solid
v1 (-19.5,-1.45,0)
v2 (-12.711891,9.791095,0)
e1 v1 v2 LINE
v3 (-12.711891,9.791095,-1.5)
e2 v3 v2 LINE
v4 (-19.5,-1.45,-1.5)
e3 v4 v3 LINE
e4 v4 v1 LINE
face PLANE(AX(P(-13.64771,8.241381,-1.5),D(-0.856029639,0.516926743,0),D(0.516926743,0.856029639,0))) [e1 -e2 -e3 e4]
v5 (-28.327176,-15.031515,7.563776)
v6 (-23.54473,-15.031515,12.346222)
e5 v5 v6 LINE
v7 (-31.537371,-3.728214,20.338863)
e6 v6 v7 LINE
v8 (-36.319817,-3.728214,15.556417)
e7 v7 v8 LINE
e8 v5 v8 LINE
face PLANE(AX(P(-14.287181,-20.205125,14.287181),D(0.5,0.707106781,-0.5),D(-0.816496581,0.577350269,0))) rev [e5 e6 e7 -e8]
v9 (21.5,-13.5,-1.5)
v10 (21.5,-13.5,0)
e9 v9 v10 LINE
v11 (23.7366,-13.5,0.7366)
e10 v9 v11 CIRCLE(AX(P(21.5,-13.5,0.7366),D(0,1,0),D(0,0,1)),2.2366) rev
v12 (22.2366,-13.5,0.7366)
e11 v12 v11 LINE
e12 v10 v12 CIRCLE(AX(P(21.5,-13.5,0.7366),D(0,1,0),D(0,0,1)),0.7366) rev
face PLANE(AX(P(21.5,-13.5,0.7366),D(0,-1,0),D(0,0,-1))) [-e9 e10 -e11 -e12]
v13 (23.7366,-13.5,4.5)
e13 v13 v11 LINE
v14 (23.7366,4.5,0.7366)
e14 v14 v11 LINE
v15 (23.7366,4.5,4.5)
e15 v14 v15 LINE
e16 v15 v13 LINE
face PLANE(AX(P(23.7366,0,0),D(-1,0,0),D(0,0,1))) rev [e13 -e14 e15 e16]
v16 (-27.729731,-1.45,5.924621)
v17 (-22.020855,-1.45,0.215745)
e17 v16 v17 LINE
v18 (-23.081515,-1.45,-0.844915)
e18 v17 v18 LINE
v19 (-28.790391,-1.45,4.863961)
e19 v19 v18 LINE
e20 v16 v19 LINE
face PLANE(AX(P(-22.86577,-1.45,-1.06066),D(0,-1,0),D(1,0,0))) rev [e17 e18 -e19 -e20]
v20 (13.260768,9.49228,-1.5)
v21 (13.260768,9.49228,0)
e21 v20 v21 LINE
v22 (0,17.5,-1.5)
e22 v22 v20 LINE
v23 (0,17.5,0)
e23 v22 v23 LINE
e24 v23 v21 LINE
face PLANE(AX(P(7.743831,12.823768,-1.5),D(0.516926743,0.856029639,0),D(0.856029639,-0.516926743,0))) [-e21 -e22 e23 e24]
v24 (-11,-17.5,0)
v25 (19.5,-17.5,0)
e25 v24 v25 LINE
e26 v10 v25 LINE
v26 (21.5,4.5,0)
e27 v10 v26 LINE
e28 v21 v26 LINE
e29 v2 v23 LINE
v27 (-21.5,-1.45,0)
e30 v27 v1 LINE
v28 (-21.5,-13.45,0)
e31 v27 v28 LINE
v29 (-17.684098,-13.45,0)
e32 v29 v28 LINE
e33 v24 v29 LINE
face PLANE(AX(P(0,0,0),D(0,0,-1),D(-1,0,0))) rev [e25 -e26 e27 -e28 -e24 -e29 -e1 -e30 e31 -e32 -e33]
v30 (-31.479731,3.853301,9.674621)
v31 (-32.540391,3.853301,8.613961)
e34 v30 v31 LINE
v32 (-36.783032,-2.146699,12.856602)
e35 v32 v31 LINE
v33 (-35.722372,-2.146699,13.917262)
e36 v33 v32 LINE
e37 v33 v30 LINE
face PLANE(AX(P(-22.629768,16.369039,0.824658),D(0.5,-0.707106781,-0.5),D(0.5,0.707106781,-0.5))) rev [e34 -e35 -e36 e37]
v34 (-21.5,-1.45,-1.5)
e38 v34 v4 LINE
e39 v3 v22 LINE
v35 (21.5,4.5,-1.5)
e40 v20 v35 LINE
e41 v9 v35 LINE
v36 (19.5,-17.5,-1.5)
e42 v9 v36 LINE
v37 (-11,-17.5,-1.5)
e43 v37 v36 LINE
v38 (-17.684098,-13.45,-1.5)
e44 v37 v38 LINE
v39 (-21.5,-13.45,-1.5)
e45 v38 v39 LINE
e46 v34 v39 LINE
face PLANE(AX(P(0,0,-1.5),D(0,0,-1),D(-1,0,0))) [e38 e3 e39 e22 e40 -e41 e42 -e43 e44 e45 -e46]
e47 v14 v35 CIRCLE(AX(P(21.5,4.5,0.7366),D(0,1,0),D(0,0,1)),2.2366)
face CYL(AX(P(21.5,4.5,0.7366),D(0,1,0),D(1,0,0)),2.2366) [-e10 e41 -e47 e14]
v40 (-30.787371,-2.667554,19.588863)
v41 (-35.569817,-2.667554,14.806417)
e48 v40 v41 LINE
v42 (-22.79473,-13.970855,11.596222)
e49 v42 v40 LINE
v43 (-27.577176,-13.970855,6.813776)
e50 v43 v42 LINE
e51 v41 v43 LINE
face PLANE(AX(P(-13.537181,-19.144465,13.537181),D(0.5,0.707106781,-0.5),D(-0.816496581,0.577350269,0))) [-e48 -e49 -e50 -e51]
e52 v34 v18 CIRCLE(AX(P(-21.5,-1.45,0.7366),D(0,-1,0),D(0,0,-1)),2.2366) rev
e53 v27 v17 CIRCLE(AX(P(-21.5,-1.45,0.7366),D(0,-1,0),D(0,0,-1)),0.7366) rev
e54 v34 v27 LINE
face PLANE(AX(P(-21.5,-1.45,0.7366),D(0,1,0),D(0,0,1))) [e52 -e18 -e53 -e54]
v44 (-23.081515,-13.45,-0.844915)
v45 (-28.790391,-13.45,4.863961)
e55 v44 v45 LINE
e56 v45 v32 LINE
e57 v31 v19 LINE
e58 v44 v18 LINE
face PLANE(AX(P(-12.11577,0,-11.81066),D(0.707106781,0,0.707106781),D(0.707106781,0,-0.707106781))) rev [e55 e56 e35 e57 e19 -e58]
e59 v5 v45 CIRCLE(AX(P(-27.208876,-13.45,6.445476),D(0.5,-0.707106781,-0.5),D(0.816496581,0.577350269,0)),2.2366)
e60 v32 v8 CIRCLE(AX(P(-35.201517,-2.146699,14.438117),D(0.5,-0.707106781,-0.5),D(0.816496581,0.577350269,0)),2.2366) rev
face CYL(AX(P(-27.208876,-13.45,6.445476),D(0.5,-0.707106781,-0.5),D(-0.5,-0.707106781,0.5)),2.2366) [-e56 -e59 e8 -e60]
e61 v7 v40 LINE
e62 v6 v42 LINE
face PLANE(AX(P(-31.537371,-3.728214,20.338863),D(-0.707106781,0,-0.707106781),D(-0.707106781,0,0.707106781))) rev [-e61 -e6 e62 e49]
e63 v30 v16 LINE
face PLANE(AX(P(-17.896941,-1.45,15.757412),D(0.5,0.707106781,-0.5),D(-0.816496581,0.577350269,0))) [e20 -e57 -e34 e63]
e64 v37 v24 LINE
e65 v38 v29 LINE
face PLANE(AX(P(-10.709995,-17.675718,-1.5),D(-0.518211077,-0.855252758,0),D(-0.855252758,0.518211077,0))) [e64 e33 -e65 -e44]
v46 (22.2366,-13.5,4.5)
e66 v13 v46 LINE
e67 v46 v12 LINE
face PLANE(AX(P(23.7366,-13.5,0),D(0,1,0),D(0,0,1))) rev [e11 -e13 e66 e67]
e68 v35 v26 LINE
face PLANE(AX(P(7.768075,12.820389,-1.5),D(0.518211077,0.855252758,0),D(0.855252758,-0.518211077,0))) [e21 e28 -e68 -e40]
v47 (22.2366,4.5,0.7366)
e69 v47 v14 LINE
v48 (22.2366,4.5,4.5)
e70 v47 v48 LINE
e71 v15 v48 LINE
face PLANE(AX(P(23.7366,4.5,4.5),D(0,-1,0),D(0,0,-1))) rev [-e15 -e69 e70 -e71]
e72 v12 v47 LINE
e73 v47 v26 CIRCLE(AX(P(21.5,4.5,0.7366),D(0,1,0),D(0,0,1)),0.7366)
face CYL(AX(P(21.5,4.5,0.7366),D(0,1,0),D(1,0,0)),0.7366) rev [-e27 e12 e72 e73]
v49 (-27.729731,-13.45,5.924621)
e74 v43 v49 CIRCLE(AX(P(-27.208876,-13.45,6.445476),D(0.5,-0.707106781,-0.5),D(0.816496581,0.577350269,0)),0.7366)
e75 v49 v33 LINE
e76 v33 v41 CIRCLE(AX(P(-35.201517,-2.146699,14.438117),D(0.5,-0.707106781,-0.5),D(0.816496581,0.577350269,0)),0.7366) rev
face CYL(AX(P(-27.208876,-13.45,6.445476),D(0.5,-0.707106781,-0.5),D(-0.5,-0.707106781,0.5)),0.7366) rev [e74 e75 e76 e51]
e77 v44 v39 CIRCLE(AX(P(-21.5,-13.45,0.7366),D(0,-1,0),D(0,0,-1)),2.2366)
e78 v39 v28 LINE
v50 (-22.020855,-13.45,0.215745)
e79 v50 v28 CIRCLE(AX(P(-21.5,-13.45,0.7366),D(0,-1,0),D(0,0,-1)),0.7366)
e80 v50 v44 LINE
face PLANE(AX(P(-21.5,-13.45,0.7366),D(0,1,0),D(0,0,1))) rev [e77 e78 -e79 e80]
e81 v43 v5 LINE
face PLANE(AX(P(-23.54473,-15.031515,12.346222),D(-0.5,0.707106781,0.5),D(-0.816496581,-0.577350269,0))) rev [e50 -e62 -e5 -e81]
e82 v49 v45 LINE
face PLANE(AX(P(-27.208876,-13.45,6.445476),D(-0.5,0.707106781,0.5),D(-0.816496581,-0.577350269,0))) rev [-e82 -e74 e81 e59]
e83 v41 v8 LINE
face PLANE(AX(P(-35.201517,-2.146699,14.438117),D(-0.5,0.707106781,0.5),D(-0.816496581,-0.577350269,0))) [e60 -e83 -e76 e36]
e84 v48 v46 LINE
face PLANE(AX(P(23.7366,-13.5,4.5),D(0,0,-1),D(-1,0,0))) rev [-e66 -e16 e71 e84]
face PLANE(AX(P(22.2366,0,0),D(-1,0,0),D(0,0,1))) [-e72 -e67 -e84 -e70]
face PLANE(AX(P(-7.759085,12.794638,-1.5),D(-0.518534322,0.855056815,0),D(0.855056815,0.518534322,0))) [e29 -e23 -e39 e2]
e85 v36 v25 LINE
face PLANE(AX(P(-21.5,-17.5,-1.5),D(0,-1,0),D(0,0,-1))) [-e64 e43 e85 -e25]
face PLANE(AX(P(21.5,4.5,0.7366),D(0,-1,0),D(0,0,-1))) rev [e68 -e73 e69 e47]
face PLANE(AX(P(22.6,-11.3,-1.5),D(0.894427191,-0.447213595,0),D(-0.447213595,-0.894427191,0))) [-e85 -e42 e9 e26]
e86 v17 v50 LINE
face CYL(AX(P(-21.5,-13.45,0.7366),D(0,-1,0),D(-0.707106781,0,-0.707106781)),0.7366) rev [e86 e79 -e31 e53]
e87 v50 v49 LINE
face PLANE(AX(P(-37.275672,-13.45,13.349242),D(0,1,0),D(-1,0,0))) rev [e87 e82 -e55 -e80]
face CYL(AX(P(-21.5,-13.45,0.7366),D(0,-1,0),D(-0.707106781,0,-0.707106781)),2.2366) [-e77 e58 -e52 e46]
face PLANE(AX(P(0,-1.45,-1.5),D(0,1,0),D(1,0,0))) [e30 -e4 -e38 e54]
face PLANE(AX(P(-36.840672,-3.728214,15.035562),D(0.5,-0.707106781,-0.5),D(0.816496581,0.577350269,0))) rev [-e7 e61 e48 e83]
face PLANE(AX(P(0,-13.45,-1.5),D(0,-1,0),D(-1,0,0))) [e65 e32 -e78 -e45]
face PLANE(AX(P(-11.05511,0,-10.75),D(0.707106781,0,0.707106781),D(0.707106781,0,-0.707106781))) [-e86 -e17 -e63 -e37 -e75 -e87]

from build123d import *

# Parameters (mm, degrees)
CROQUIS1_W              = 43
CROQUIS1_H              = 35
BRIDA_BASE1_DEPTH       = 1.5
CROQUIS6_W              = 59.566817112
CROQUIS6_H              = 45.88022185
CORTAR_EXTRUIR1_DEPTH   = 10
BRIDA_DE_ARISTA1_DEPTH  = 18
BRIDA_DE_ARISTA2_DEPTH  = 12
CORTAR_EXTRUIR2_DEPTH   = 10
SALIENTE_EXTRUIR1_DEPTH = 1.5
CORTAR_EXTRUIR3_DEPTH   = 10
BRIDA_DE_ARISTA3_DEPTH  = 15.985281374


# Sheet-metal steps are written as plain solids
with BuildPart() as part:
    # Croquis1 → Brida base1 (new body)
    with BuildSketch(Plane.XY):
        Rectangle(CROQUIS1_W, CROQUIS1_H)
    extrude(amount=-BRIDA_BASE1_DEPTH)

    # Croquis6 → Cortar-Extruir1 (cut)
    with BuildSketch(Plane.XY):
        Rectangle(CROQUIS6_W, CROQUIS6_H)
        Polygon((19.5, -17.5), (21.5, -13.5), (21.5, 4.5), (13.260768396, 9.49227982), (0, 17.5), (-12.711890801, 9.791095082), (-19.5, -1.45), (-21.5, -1.45), (-21.5, -13.45), (-17.684098087, -13.45), (-11, -17.5), align=None, mode=Mode.SUBTRACT)
    extrude(amount=-CORTAR_EXTRUIR1_DEPTH, mode=Mode.SUBTRACT)

    # Brida de arista1 section (across the edge) → Brida de arista1 (add)
    with BuildSketch(Plane(origin=(22.2366, -13.5, 0), x_dir=(-1, 0, 0), z_dir=(0, 1, 0))):
        with BuildLine():
            Line((-1.5, 0.7366), (-1.5, 4.5))
            Line((-1.5, 4.5), (0, 4.5))
            Line((0, 4.5), (0, 0.7366))
            ThreePointArc((0, 0.7366), (0.215745145, 0.215745145), (0.7366, 0))
            Line((0.7366, 0), (0.7366, -1.5))
            ThreePointArc((0.7366, -1.5), (-0.844915027, -0.844915027), (-1.5, 0.7366))
        make_face()
    extrude(amount=BRIDA_DE_ARISTA1_DEPTH)

    # Brida de arista2 section (across the edge) → Brida de arista2 (add)
    with BuildSketch(Plane(origin=(-21.80510971, -1.45, 0), x_dir=(0.7071067811865438, 0, 0.7071067811865512), z_dir=(0, -1, 0))):
        with BuildLine():
            Line((-1.5, 0.30510971), (-1.5, 20.378679656))
            Line((-1.5, 20.378679656), (0, 20.378679656))
            Line((0, 20.378679656), (0, 0.30510971))
            ThreePointArc((0, 0.30510971), (0.056070336, 0.023225094), (0.215745145, -0.215745145))
            Line((0.215745145, -0.215745145), (-0.844915027, -1.276405317))
            ThreePointArc((-0.844915027, -1.276405317), (-1.329748962, -0.550800055), (-1.5, 0.30510971))
        make_face()
    extrude(amount=BRIDA_DE_ARISTA2_DEPTH)

    # Croquis13 → Cortar-Extruir2 (cut)
    with BuildSketch(Plane(origin=(-11.963215027, 0, -11.963215027), x_dir=(-0.7071067811865511, 0, 0.707106781186544), z_dir=(-0.707106781186544, 0, -0.7071067811865511))):
        Polygon((35.797220597, -1.45), (21.51312871, -15.734091887), (35.797220597, -15.734091887), align=None)
    extrude(amount=-CORTAR_EXTRUIR2_DEPTH, mode=Mode.SUBTRACT)

    # Croquis14 → Saliente-Extruir1 (add)
    with BuildSketch(Plane(origin=(-11.963215027, 0, -11.963215027), x_dir=(-0.7071067811865511, 0, 0.707106781186544), z_dir=(-0.707106781186544, 0, -0.7071067811865511))):
        Polygon((23.797220597, -1.45), (30.161181628, 4.913961031), (36.161181628, -1.086038969), (35.797220597, -1.45), align=None)
    extrude(amount=-SALIENTE_EXTRUIR1_DEPTH)

    # Croquis15 → Cortar-Extruir3 (cut)
    with BuildSketch(Plane(origin=(-11.963215027, 0, -11.963215027), x_dir=(-0.7071067811865511, 0, 0.707106781186544), z_dir=(-0.707106781186544, 0, -0.7071067811865511))):
        Polygon((30.161181628, 4.913961031), (36.161181628, -1.086038969), (35.100521456, -2.146699141), (29.100521456, 3.853300859), align=None)
    extrude(amount=-CORTAR_EXTRUIR3_DEPTH, mode=Mode.SUBTRACT)

    # Brida de arista3 section (across the edge) → Brida de arista3 (add)
    with BuildSketch(Plane(origin=(-36.0906716, -2.667553996, 14.28556189), x_dir=(0.5000000000000052, 0.7071067811865475, -0.499999999999995), z_dir=(0.5000000000000028, -0.7071067811865477, -0.49999999999999717))):
        with BuildLine():
            Line((-1.5, 0.7366), (-1.5, 7.5))
            Line((-1.5, 7.5), (0, 7.5))
            Line((0, 7.5), (0, 0.7366))
            ThreePointArc((0, 0.7366), (0.215745145, 0.215745145), (0.7366, 0))
            Line((0.7366, 0), (0.7366, -1.5))
            ThreePointArc((0.7366, -1.5), (-0.844915027, -0.844915027), (-1.5, 0.7366))
        make_face()
    extrude(amount=BRIDA_DE_ARISTA3_DEPTH)


solid = part.part
